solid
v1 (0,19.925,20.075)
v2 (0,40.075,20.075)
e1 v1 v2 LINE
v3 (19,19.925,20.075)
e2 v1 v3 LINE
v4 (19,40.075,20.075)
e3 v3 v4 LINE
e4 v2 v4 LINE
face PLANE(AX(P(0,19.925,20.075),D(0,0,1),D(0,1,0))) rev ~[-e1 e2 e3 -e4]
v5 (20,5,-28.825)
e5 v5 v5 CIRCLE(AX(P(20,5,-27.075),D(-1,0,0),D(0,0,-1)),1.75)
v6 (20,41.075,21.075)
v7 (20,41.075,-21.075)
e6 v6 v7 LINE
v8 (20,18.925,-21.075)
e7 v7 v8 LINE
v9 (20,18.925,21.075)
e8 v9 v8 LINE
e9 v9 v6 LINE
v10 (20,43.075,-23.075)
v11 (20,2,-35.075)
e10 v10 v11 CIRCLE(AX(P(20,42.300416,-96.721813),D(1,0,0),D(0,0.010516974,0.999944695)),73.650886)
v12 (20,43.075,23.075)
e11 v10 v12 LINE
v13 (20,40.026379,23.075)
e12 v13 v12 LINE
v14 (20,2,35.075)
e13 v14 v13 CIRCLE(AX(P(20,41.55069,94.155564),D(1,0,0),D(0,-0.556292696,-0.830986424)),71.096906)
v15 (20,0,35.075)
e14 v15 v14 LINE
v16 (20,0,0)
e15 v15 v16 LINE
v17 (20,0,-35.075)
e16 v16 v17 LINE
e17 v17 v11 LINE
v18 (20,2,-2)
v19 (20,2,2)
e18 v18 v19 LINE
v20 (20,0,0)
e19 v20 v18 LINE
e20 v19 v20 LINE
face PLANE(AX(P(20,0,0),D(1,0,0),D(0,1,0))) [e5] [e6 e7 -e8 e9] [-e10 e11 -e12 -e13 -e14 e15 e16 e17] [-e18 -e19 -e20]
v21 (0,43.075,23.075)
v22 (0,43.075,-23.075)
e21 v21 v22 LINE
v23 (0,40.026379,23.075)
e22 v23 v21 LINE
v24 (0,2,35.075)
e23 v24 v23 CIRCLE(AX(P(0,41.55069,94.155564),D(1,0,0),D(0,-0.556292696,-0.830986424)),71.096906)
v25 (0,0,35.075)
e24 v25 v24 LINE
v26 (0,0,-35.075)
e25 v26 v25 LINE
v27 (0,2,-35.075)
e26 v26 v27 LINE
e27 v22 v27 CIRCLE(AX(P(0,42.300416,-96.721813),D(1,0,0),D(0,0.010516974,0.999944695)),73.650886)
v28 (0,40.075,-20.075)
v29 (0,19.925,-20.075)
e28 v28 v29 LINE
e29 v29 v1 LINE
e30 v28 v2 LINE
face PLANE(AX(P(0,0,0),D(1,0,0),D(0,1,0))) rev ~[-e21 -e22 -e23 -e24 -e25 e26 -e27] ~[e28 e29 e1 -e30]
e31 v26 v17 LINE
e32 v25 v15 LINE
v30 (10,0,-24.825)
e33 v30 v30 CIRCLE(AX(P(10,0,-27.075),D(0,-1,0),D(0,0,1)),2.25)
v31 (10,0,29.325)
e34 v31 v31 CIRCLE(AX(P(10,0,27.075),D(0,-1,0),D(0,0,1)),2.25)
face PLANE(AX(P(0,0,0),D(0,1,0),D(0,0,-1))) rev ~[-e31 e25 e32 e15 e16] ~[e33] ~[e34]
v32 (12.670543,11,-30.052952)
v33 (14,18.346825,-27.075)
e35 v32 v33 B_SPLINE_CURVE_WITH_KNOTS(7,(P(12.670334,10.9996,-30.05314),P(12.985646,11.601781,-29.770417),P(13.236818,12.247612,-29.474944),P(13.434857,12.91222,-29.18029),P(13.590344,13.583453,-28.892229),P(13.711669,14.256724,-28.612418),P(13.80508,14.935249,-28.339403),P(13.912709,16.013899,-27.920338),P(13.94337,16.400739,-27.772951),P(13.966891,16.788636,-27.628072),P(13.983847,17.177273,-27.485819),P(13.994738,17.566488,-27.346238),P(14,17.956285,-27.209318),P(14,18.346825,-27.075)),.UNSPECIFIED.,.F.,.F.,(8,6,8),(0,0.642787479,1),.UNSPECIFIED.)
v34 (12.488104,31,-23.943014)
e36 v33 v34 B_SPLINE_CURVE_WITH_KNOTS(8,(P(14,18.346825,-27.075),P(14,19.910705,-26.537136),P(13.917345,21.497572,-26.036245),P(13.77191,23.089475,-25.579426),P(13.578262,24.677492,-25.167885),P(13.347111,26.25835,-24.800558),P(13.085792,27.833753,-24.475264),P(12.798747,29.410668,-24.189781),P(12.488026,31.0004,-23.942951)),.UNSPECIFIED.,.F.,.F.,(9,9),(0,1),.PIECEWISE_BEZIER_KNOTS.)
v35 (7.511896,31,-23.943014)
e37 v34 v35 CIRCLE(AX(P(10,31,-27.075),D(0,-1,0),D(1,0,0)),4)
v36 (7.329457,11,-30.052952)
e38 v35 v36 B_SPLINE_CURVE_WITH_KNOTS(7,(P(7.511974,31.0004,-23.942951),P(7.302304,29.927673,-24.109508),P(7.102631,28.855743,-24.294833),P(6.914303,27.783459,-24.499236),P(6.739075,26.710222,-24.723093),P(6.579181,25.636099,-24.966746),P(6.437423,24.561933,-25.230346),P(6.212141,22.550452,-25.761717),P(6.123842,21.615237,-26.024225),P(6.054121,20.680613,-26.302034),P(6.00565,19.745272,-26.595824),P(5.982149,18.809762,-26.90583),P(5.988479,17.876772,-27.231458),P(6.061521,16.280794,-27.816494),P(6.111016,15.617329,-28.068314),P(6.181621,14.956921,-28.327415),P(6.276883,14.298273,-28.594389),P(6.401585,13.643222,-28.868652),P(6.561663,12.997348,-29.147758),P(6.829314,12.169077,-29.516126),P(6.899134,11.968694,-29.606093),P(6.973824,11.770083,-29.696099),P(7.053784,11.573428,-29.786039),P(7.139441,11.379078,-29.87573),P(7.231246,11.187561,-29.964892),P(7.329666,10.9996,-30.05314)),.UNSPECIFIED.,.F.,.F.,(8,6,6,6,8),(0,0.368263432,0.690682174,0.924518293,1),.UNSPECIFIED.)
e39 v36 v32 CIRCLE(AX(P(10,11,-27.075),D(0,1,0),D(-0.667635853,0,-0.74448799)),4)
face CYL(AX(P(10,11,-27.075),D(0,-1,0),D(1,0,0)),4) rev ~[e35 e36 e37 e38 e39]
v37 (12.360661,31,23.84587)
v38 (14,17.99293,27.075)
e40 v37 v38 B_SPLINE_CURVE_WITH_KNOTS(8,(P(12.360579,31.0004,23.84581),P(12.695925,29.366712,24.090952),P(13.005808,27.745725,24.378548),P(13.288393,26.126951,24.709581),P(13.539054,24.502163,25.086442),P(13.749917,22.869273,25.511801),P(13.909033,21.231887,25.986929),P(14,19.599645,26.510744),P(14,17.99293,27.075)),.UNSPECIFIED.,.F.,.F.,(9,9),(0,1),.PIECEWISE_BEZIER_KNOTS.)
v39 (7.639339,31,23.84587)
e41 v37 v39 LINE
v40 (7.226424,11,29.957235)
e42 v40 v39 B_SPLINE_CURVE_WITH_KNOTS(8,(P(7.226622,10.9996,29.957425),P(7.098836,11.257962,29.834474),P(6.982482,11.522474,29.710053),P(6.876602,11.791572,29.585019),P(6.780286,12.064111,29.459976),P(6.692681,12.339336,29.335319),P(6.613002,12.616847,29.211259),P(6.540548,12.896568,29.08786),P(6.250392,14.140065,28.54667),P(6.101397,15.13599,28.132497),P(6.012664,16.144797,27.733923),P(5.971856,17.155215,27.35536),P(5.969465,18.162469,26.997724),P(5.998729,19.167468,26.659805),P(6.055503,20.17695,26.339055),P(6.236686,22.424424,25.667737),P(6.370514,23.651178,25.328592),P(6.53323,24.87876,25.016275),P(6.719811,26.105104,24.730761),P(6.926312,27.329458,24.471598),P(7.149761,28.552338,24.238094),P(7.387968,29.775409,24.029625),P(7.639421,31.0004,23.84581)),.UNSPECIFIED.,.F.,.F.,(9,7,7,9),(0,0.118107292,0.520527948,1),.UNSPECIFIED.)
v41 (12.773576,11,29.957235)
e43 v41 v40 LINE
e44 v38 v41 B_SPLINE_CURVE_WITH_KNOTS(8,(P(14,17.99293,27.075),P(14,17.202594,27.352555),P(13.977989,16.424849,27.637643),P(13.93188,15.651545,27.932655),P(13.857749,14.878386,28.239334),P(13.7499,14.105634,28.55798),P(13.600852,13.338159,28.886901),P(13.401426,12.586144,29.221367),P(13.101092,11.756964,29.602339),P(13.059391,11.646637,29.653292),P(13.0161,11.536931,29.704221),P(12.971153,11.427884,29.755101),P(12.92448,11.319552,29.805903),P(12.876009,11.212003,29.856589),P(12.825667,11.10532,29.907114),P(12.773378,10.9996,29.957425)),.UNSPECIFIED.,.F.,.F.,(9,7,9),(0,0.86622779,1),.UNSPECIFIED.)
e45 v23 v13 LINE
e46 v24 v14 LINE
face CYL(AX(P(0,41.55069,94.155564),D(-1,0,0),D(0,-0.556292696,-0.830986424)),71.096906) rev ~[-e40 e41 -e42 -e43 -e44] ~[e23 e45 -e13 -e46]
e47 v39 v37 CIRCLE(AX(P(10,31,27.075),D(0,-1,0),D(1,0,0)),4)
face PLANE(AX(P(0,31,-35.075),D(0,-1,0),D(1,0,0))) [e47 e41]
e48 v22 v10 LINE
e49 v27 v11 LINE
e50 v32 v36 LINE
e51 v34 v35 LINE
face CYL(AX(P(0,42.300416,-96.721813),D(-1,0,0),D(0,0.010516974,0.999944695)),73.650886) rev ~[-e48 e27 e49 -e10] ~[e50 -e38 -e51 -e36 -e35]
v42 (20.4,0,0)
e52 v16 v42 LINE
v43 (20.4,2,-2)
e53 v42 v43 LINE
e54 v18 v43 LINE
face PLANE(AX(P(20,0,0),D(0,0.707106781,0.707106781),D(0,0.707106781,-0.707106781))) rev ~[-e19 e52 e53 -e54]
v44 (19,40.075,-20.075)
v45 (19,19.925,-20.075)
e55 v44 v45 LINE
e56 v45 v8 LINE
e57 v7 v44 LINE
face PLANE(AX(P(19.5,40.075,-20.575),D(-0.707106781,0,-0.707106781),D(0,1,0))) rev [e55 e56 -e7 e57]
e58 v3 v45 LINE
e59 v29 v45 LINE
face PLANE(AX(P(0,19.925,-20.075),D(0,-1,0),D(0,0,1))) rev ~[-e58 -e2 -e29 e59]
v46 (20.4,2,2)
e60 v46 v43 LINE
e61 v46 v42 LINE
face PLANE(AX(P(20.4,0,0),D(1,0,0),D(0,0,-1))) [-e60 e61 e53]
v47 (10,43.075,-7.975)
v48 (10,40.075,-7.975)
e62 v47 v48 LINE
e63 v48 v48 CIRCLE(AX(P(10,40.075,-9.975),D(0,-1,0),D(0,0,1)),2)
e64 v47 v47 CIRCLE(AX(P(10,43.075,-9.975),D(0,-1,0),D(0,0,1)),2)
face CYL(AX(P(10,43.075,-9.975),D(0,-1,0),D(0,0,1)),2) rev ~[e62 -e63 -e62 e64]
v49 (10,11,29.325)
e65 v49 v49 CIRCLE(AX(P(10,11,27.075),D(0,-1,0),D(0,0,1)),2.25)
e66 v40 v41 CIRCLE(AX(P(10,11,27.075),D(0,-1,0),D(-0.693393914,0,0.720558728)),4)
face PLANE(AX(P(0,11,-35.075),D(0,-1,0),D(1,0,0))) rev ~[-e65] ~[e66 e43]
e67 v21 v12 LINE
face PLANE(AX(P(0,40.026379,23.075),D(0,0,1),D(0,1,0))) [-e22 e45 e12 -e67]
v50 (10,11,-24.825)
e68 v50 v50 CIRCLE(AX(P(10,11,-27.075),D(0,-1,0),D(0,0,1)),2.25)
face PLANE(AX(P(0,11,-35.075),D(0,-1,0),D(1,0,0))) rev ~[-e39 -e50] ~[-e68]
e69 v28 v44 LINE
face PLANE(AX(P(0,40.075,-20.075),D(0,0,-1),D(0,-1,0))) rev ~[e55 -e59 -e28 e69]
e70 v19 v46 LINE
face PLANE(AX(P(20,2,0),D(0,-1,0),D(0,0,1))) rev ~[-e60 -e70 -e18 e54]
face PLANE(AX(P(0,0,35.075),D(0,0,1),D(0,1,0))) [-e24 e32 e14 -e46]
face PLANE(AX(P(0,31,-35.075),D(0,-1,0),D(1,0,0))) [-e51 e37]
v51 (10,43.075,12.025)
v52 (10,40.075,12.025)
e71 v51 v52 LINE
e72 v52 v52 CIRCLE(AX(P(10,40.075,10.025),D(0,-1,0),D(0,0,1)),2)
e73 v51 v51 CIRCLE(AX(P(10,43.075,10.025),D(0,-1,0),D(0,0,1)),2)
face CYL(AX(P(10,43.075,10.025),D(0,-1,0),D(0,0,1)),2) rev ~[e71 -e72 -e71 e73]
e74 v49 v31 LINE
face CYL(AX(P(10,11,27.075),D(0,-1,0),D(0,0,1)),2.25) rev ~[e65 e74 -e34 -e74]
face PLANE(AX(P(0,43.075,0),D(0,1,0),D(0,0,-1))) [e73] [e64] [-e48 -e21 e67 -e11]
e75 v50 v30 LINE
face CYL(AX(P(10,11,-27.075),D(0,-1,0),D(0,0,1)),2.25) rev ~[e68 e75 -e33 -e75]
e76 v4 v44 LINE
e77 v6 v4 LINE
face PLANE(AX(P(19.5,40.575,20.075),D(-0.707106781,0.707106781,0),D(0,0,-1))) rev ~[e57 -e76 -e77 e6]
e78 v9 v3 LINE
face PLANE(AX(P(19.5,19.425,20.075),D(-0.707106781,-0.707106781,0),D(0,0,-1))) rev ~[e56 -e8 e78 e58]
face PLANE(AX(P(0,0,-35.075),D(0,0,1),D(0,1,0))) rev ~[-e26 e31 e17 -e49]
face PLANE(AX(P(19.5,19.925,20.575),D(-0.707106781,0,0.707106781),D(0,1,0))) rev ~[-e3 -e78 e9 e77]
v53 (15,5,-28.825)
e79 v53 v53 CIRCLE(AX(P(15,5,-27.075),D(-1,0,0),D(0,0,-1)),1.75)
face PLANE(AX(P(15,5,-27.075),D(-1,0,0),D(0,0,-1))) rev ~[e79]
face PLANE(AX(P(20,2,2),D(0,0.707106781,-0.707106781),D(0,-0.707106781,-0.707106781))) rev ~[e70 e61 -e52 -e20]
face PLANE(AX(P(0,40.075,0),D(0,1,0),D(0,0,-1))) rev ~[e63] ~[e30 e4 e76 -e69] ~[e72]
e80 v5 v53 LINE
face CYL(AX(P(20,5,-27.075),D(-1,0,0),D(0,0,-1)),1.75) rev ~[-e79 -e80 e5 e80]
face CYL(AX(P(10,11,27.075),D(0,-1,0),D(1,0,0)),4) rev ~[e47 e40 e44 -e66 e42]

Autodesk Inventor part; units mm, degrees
ref_plane "YZ Plane" through (0, 0, 0) normal (1, 0, 0) x (0, 1, 0)
ref_plane "XZ Plane" through (0, 0, 0) normal (0, 1, 0) x (-1, 0, 0)
ref_plane "XY Plane" through (0, 0, 0) normal (0, 0, 1) x (1, 0, 0)
sketch "Sketch1" plane through (0, 0, 0) normal (1, 0, 0) x (0, 1, 0)
  line L0 (0, 0) -> (0, -35.075)
  line L1 (0, -35.075) -> (2, -35.075)
  line L2 (19.925, 20.075) -> (40.075, 20.075)
  line L3 (40.075, 20.075) -> (40.075, -20.075)
  line L4 (40.075, -20.075) -> (19.925, -20.075)
  line L5 (19.925, -20.075) -> (19.925, 20.075)
  line L6 (19.925, 20.075) -> (40.075, -20.075) construction
  line L7 (40.075, 20.075) -> (19.925, -20.075) construction
  line L8 (16.925, 23.075) -> (43.075, 23.075)
  line L9 (43.075, 23.075) -> (43.075, -23.075)
  line L10 (43.075, -23.075) -> (16.925, -23.075)
  line L11 (16.925, -23.075) -> (16.925, 23.075)
  line L12 (16.925, 23.075) -> (43.075, -23.075) construction
  line L13 (43.075, 23.075) -> (16.925, -23.075) construction
  line L14 (0, 0) -> (0, 35.075)
  line L15 (0, 35.075) -> (2, 35.075)
  arc A0 (2, 35.075) -> (43.075, 23.075) centre (41.5508, 94.1558) ccw
  arc A1 (43.075, -23.075) -> (2, -35.075) centre (42.3004, -96.7217) ccw
  line L16 (-8.615, 0) -> (51.69, 0) projected
  point P0 (20, 0)
  point P1 (40.1, 0)
  point P2 (30, 0)
  point P3 (30, 23.075)
  point P4 (30.025, -23.075)
  point P5 (30, 0)
  dimension "d0" = 35.075
  dimension "d1" = 2
  dimension "d2" = 20
  dimension "d4" = 20.15
  dimension "d5" = 40.15
  dimension "d6" = 46.15
  dimension "d7" = 26.15
  dimension "d8" = 35.075
extrude "Extrusion1" add sketch "Sketch1" along normal blind 20 contours L10 L11 L16 L5 L4 L3 L9 | L16 L11 L10 A1 L1 L0 | L14 L15 A0 L8 L11 L16 | L11 L8 A0 L9 L16 L3 L2 L5 | L8 A0
sketch "Sketch2" plane through (0, 43.075, 23.075) normal (0, 1, 0) x (1, 0, 0)
  line L0 (0, 46.15) -> (0, 0) projected
  line L1 (0, 0) -> (20, 0) projected
  line L2 (20, 46.15) -> (20, 0) projected
  line L3 (0, 46.15) -> (20, 46.15) projected
  line L4 (0, 3) -> (20, 3) projected
  line L5 (0, 3) -> (20, 3) projected
  point P0 (0, 23.075)
  point P1 (10, 13.05)
  point P2 (10, 33.05)
  dimension "d33" = 20
  dimension "d34" = 10.05
hole "Hole1" at (10, 43.075, 10.025) at (10, 43.075, -9.975) direction (0, -1, 0) diameter 4 end up to surface
ref_plane "Work Plane1" through (0, 11, -35.075) normal (0, -1, 0) x (1, 0, 0)
sketch "Sketch3" plane through (0, 11, -35.075) normal (0, -1, 0) x (1, 0, 0)
  circle A0 centre (10, 45.1) radius 2 projected
  line L0 (0, 12) -> (0, 58.15) projected
  line L1 (0, 58.15) -> (20, 58.15) projected
  line L2 (20, 12) -> (20, 58.15) projected
  line L3 (0, 12) -> (20, 12) projected
  line L4 (0, 55.15) -> (0, 15) projected
  line L5 (0, 55.15) -> (20, 55.15) projected
  line L6 (20, 15) -> (20, 55.15) projected
  line L7 (0, 15) -> (20, 15) projected
  circle A1 centre (10, 62.15) radius 4
  circle A2 centre (10, 8) radius 4
  point P0 (0, 35.075)
  dimension "d19" = 4
  dimension "d20" = 4
  dimension "d30" = 8
  dimension "d31" = 8
extrude "Extrusion2" cut sketch "Sketch3" against normal blind 20 contours A1 | A2
hole "Hole2" at (10, 11, 27.075) at (10, 11, -27.075) direction (0, -1, 0) diameter 4.5 end through all
chamfer "Chamfer1" distance 1 angle 45 4 edges at (20, 40.075, 0) (20, 30, 20.075) (20, 19.925, 0) (20, 30, -20.075)
sketch "Sketch4" plane through (20, 0, 0) normal (1, 0, 0) x (0, 0, -1)
  line L0 (0, -8.615) -> (0, 51.69) projected
  line L1 (-35.075, 0) -> (35.075, 0) projected
  line L2 (0, 0) -> (2, 2)
  line L3 (2, 2) -> (-2, 2)
  line L4 (-2, 2) -> (0, 0)
extrude "Extrusion3" add sketch "Sketch4" along normal blind 0.4
sketch "Sketch5" plane through (20, 0, 0) normal (1, 0, 0) x (0, 0, -1)
  line L0 (0, 0) -> (35.075, 0) projected
  line L1 (35.075, 0) -> (35.075, 2) projected
  point P0 (27.075, 5)
  dimension "d42" = 5
  dimension "d43" = 8
hole "Hole3" at (20, 5, -27.075) direction (-1, 0, 0) diameter 3.5 depth 5
equation "\"d8\" = d0"
equation "\"d20\" = d19"
equation "\"d31\" = d30"
properties part number "espaceur_20mm_v3"
